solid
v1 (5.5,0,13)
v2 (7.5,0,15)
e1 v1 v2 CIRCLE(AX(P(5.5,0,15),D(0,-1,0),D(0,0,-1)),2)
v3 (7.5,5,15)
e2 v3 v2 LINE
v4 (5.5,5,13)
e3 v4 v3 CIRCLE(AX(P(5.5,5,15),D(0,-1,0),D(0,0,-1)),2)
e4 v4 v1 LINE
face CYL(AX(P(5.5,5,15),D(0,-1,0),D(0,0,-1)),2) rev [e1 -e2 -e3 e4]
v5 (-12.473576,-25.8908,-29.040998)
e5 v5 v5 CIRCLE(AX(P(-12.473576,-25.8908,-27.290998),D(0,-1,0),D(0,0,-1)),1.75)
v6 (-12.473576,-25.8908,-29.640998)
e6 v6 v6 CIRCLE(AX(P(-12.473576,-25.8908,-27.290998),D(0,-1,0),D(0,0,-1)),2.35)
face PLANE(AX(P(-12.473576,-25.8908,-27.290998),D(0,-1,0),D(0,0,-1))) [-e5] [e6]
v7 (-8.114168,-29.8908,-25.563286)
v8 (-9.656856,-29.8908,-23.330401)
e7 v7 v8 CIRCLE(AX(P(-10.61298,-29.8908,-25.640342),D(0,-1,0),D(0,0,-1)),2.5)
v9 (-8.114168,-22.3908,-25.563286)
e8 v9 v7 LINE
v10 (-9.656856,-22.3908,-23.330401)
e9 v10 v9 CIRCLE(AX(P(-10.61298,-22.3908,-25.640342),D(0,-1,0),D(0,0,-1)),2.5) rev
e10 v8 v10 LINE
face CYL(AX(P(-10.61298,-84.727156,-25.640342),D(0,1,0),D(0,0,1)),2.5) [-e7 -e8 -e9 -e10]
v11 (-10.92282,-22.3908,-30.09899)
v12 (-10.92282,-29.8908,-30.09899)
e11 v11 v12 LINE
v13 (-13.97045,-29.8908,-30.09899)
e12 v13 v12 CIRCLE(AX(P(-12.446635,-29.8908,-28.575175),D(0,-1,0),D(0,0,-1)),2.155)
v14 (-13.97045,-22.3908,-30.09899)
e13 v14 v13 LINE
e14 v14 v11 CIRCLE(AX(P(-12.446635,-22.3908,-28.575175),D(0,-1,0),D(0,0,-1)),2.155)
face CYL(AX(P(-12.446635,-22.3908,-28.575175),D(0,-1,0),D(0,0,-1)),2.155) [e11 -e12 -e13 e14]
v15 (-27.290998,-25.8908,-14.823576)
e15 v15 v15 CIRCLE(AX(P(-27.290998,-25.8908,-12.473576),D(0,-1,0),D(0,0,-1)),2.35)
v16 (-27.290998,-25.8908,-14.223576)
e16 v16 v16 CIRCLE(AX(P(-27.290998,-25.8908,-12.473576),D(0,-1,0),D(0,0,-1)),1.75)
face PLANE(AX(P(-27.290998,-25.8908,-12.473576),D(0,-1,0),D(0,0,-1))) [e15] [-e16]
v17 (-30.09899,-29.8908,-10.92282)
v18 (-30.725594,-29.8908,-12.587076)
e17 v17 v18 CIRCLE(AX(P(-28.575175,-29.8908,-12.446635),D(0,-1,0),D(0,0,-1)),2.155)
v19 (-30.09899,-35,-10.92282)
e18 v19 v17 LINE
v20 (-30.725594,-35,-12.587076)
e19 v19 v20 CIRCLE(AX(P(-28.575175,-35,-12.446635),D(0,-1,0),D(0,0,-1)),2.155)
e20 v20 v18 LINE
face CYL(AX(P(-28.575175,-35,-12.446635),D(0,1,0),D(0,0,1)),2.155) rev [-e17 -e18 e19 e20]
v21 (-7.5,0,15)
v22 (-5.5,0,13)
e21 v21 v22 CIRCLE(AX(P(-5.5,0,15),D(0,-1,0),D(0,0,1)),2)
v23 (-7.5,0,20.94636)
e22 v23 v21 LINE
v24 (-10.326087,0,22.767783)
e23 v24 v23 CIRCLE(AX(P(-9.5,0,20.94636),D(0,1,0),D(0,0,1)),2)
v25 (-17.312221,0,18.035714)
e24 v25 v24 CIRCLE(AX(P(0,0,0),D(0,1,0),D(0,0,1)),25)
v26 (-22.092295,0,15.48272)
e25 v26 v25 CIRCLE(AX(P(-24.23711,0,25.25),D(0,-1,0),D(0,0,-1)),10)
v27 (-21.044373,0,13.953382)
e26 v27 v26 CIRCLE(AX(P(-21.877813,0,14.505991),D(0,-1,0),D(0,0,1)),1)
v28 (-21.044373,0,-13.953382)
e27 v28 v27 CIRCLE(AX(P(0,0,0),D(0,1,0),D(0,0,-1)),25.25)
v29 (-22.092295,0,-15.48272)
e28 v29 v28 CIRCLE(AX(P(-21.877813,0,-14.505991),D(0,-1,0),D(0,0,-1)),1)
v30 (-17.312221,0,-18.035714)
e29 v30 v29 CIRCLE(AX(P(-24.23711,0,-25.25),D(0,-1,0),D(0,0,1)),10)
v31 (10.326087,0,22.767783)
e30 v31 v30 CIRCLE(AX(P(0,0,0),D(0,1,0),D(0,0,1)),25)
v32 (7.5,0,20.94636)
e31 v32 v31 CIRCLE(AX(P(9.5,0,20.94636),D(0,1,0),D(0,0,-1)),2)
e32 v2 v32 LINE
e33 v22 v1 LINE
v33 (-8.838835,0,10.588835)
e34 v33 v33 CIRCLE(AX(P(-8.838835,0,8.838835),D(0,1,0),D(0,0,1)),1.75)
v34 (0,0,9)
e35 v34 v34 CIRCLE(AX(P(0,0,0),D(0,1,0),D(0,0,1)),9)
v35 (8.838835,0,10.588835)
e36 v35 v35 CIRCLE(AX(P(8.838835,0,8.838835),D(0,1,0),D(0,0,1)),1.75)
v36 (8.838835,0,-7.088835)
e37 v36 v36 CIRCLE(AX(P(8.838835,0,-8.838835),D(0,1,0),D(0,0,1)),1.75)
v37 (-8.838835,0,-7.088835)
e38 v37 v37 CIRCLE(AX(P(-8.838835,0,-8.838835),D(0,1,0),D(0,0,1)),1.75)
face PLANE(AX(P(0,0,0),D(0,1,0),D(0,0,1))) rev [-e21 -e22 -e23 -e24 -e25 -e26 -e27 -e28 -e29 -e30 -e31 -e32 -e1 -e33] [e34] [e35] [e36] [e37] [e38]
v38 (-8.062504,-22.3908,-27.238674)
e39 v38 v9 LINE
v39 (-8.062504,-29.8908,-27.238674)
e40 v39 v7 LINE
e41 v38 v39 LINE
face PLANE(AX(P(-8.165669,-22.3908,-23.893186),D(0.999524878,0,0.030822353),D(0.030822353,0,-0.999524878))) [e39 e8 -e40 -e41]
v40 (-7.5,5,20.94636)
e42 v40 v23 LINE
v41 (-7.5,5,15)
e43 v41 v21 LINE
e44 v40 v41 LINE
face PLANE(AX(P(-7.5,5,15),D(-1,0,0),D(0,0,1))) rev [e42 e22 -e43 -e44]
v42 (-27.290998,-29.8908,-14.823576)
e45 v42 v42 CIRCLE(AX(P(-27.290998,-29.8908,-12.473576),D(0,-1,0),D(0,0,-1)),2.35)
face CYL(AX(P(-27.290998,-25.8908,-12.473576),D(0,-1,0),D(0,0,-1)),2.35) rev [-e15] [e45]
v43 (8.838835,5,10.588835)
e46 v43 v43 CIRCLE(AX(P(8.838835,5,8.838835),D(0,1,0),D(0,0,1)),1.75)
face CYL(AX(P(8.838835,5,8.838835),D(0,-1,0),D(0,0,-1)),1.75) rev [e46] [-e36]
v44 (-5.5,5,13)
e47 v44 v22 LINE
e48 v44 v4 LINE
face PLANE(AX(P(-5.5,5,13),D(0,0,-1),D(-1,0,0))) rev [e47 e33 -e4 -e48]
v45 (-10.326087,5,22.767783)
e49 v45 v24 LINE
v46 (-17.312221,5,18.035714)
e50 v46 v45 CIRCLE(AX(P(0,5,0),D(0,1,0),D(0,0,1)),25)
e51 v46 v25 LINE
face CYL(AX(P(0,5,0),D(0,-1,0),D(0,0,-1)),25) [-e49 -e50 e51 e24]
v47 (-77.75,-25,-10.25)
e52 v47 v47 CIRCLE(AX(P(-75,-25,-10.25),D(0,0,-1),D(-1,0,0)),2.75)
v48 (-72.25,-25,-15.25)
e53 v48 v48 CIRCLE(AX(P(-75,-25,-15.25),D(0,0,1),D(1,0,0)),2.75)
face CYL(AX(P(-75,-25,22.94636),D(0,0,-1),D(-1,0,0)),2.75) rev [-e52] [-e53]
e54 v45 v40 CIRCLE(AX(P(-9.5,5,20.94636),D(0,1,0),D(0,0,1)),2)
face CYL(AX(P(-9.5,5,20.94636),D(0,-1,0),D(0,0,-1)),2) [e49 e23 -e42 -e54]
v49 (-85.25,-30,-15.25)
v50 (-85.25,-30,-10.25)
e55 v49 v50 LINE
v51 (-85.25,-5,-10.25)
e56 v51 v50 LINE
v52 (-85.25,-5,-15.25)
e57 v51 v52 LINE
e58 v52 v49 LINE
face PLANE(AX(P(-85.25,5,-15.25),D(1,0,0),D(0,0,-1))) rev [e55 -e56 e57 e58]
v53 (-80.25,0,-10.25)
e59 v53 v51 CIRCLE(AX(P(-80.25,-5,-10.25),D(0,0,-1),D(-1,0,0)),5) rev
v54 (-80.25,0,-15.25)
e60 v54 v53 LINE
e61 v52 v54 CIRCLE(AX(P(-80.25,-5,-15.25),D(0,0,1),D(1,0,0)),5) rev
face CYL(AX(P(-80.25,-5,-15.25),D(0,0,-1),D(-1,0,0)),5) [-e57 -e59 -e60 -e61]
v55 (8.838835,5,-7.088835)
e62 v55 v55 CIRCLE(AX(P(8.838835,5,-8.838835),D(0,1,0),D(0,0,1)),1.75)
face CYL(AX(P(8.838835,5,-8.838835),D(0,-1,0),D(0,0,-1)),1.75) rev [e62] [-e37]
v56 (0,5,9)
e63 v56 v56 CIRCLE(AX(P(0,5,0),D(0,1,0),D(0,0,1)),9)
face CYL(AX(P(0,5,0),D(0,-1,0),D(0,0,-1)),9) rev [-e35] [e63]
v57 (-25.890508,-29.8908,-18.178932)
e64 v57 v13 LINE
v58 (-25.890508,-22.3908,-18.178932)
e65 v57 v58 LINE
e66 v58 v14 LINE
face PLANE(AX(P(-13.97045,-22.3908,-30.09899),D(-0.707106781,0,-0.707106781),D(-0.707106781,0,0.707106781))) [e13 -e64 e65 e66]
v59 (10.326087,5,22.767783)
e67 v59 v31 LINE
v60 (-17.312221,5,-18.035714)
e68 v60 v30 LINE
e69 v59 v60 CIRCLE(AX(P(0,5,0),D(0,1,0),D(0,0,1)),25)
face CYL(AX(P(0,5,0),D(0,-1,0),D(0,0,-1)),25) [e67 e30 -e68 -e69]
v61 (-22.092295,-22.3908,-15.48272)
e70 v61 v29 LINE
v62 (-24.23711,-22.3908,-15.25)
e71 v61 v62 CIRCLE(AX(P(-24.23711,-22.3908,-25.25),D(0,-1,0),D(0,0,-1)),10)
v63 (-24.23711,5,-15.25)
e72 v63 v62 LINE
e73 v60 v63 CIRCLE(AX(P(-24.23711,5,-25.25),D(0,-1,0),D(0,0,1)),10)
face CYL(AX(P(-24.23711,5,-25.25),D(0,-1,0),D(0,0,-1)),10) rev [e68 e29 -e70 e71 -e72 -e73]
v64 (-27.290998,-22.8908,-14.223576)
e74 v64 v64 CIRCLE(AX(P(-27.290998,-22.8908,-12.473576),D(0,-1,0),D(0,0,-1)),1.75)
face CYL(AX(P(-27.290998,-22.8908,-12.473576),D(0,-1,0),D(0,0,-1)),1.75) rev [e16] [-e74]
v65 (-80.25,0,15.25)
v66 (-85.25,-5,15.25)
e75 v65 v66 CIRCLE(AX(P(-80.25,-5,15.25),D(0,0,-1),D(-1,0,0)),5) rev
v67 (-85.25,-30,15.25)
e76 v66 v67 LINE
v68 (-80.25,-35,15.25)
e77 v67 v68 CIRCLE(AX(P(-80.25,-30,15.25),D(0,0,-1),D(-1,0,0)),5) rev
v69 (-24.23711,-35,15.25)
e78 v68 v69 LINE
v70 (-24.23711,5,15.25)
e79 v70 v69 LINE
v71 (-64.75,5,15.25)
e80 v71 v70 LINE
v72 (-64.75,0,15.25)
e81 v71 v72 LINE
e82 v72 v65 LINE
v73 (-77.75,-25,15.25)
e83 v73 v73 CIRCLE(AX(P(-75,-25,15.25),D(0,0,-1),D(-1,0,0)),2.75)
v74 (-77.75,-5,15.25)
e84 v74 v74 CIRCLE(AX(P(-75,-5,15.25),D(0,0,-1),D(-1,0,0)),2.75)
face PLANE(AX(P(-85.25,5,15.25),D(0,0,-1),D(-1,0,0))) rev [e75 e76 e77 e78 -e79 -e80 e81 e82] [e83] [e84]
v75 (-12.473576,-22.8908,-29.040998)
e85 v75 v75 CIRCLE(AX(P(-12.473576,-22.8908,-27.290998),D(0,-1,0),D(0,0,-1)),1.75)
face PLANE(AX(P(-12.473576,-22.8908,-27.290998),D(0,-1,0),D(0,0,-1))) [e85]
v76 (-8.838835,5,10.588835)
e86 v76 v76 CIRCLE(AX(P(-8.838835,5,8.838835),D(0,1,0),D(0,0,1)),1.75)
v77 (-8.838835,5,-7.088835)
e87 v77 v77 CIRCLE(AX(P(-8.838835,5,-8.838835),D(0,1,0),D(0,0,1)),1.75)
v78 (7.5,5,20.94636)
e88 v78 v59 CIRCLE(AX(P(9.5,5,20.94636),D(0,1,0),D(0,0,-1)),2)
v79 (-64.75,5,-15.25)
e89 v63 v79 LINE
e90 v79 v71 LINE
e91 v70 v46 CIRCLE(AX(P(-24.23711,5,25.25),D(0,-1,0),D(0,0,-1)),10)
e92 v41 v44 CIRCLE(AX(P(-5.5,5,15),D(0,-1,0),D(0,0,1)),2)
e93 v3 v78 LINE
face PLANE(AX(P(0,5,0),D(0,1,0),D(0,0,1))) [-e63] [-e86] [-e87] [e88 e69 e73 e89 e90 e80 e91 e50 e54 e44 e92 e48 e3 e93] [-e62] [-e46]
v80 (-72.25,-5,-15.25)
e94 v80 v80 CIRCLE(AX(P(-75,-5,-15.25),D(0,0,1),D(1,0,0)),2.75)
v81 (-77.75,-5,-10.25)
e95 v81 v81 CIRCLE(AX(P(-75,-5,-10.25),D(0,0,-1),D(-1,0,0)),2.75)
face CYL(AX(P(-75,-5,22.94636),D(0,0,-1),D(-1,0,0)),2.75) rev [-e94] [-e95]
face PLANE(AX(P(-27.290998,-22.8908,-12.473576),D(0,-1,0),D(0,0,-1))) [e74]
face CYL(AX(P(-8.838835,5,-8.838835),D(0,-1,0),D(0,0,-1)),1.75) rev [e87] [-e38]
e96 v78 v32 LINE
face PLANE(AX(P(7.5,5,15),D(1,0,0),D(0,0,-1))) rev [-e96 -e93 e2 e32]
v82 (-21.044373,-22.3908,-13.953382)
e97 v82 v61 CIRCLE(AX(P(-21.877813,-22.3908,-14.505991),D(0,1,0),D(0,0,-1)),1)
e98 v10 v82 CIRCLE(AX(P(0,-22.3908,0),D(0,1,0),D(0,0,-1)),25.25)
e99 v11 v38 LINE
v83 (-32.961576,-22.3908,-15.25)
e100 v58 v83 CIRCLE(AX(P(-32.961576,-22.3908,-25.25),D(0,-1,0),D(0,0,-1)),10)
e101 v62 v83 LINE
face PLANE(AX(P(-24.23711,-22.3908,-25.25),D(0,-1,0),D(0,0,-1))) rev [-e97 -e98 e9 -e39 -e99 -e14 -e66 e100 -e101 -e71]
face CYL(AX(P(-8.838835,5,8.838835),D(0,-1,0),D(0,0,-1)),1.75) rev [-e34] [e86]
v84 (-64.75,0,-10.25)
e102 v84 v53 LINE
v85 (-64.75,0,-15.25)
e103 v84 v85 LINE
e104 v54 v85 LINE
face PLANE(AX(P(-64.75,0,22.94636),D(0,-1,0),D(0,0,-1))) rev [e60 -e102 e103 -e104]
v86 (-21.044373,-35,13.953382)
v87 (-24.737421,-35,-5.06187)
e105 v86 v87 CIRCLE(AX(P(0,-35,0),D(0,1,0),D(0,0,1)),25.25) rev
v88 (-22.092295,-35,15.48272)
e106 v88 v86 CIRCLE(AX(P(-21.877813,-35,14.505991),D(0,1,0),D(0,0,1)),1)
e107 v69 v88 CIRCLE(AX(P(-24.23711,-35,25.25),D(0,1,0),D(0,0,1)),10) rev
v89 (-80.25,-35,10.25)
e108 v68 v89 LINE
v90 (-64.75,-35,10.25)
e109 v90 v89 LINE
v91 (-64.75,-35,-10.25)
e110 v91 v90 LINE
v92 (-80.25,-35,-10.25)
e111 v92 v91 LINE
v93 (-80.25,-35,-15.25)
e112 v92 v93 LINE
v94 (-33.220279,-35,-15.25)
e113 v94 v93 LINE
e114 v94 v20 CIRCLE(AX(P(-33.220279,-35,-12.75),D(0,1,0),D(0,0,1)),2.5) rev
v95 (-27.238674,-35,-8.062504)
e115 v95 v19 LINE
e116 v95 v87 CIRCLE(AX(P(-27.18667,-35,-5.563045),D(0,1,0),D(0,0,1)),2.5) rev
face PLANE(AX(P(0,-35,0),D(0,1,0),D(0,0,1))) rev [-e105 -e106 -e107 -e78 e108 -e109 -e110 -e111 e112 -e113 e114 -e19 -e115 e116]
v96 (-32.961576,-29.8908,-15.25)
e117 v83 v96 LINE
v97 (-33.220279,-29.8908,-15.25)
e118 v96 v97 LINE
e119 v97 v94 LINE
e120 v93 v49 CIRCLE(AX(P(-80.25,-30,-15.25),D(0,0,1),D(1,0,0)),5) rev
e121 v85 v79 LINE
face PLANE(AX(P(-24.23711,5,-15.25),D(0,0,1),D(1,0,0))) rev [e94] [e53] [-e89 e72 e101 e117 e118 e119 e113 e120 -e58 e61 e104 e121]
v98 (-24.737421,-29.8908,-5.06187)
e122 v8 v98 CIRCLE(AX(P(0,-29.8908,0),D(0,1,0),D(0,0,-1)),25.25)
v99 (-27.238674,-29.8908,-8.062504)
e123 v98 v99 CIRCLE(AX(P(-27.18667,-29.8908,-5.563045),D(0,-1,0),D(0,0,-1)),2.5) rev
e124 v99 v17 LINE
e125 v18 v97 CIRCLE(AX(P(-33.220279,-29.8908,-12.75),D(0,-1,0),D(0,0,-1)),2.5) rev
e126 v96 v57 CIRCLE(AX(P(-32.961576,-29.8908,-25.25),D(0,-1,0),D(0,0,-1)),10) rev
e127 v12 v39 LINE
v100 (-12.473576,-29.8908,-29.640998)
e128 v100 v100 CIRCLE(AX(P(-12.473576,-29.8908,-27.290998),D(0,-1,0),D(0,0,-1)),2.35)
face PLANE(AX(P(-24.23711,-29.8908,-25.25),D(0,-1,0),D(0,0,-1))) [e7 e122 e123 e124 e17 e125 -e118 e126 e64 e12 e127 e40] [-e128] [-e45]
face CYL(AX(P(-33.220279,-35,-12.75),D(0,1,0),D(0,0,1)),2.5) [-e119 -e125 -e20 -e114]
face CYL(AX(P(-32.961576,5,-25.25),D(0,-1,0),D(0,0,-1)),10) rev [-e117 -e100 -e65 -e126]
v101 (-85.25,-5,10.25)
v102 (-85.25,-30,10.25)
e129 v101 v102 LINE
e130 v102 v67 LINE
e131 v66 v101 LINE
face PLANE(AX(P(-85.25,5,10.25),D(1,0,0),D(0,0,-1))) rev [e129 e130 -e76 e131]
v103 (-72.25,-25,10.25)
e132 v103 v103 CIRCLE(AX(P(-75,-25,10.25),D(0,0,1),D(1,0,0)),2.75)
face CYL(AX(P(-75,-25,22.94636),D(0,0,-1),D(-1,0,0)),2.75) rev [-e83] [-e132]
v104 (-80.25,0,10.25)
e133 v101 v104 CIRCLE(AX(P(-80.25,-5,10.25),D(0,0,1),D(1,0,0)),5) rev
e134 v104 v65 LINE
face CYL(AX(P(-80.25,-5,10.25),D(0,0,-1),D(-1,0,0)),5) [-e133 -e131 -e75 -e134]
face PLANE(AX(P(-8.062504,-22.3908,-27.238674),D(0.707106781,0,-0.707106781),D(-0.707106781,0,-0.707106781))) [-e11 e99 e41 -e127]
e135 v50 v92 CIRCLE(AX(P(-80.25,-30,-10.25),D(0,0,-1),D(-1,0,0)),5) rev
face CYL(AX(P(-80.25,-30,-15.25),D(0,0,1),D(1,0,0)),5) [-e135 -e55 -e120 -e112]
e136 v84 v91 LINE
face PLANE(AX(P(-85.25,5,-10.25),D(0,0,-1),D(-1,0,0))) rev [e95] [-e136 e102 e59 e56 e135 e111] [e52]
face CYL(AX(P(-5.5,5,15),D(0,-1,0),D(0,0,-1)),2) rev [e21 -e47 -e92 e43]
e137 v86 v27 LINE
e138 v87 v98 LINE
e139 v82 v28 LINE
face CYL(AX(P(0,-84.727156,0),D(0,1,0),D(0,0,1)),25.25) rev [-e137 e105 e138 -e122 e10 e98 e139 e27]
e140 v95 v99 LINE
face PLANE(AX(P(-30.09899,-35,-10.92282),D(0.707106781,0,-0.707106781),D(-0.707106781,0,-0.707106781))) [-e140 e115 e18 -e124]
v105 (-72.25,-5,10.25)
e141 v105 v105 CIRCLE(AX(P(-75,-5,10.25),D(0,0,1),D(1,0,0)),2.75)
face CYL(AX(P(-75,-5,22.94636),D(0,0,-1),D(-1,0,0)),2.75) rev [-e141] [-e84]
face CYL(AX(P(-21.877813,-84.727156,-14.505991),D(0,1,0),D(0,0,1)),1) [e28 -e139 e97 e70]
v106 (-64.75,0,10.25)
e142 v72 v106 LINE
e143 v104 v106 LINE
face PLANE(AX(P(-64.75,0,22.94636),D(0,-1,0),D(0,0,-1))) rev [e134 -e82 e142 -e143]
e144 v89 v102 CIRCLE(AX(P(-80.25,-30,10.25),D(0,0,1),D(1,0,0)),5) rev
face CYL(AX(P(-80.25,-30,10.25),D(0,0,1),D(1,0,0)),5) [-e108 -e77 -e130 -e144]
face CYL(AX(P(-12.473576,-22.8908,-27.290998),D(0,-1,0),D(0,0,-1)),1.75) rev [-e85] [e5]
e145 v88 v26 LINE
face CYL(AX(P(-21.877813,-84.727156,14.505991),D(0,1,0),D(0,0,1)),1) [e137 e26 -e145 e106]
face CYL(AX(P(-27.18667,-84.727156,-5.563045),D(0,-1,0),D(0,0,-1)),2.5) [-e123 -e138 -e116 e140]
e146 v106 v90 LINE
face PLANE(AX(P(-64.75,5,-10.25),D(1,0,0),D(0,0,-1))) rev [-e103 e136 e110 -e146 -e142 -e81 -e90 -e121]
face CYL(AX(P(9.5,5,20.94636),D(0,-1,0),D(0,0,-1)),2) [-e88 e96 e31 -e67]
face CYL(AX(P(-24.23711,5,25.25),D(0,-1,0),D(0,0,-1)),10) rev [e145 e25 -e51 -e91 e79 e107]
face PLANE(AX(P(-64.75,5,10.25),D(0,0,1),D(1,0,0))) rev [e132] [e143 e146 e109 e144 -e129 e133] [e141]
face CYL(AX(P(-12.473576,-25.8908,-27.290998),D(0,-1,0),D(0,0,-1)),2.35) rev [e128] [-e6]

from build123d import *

# Parameters (mm, degrees)
SKETCH1_R               = 1.7499999999999998
SKETCH1_R_2             = 9
MOTOR_PLATE_DEPTH       = 5
BOSS_EXTRUDE1_DEPTH     = 35
BOSS_EXTRUDE2_START     = 35
BOSS_EXTRUDE2_DEPTH     = 35
CUT_EXTRUDE5_DEPTH      = 100.75732766200707
CUT_EXTRUDE5_DEPTH_BACK = 100.75732766200707
SKETCH11_R              = 2.7500000000000084
SKETCH11_R_2            = 2.750000000000008
CUT_EXTRUDE7_DEPTH      = 100.75732766200707
CUT_EXTRUDE7_DEPTH_BACK = 100.75732766200707
SKETCH14_W              = 20.499999999999986
SKETCH14_H              = 5
FILLET4_R               = 5
BOSS_EXTRUDE5_DEPTH     = 7.5
CUT_EXTRUDE14_DEPTH     = 98.1044493253111
SKETCH27_R              = 2.3500000000000005
CUT_EXTRUDE15_DEPTH     = 4
SKETCH28_R              = 1.7499999999999998
SKETCH28_R_2            = 1.7500000000000004
CUT_EXTRUDE16_DEPTH     = 7
FILLET5_R               = 2.5
FILLET6_R               = 10


with BuildPart() as part:
    # Sketch1 → Motor Plate (new body)
    with BuildSketch(Plane(origin=(0, 0, 0), x_dir=(1, 0, 0), z_dir=(0, 1, 0))):
        with BuildLine():
            Line((-24.237109976232734, 15.250000000000002), (-85.24999999999999, 15.25))
            Line((-85.24999999999999, 15.25), (-85.24999999999999, 10.25))
            Line((-85.24999999999999, 10.25), (-64.75, 10.25))
            Line((-64.75, 10.25), (-64.75, -10.250000000000002))
            Line((-64.75, -10.250000000000002), (-85.24999999999999, -10.250000000000002))
            Line((-85.24999999999999, -10.250000000000002), (-85.24999999999999, -15.250000000000002))
            Line((-85.24999999999999, -15.250000000000002), (-24.237109976232734, -15.25))
            ThreePointArc((-24.237109976232734, -15.25), (-20.505009839771837, -15.972531133362475), (-17.31222141159481, -18.03571428571429))
            ThreePointArc((-17.31222141159481, -18.03571428571429), (-14.020240375434447, -20.698619756279353), (-10.326086956521745, -22.76778268005806))
            ThreePointArc((-10.326086956521745, -22.76778268005806), (-8.416527322228076, -22.627457016016997), (-7.500000000000001, -20.94636006565341))
            Line((-7.500000000000001, -20.94636006565341), (-7.500000000000001, -15))
            ThreePointArc((-7.500000000000001, -15), (-6.914213562373096, -13.585786437626904), (-5.500000000000001, -13))
            Line((-5.500000000000001, -13), (5.499999999999999, -13))
            ThreePointArc((5.499999999999999, -13), (6.914213562373094, -13.585786437626904), (7.499999999999999, -15))
            Line((7.499999999999999, -15), (7.499999999999999, -20.94636006565341))
            ThreePointArc((7.499999999999999, -20.94636006565341), (8.416527322228072, -22.627457016016997), (10.32608695652174, -22.76778268005806))
            ThreePointArc((10.32608695652174, -22.76778268005806), (20.698619756279356, 14.020240375434444), (-17.31222141159481, 18.035714285714285))
            ThreePointArc((-17.31222141159481, 18.035714285714285), (-20.50500983977184, 15.972531133362477), (-24.237109976232734, 15.250000000000002))
        make_face()
        with Locations(Location((8.838834764831846, 8.838834764831835, 0), (0, 0, 270))):
            Circle(SKETCH1_R, mode=Mode.SUBTRACT)
        with Locations(Location((-8.838834764831843, 8.838834764831846, 0), (0, 0, 270))):
            Circle(SKETCH1_R, mode=Mode.SUBTRACT)
        with Locations(Location((-8.838834764831843, -8.838834764831846, 0), (0, 0, 270))):
            Circle(SKETCH1_R, mode=Mode.SUBTRACT)
        with Locations(Location((8.838834764831846, -8.838834764831835, 0), (0, 0, 270))):
            Circle(SKETCH1_R, mode=Mode.SUBTRACT)
        with Locations(Location((0, 0, 0), (0, 0, 270))):
            Circle(SKETCH1_R_2, mode=Mode.SUBTRACT)
    extrude(amount=MOTOR_PLATE_DEPTH)

    # Sketch3 → Boss-Extrude1 (add)
    with BuildSketch(Plane.XZ):
        Polygon((-85.24999999999999, 15.250000000000002), (-85.24999999999999, 10.250000000000002), (-64.75, 10.250000000000002), (-64.75, -10.25), (-85.24999999999999, -10.25), (-85.24999999999999, -15.25), (-59.75, -15.25), (-59.75, 15.250000000000002), align=None)
    extrude(amount=BOSS_EXTRUDE1_DEPTH)

    # Sketch4 → Boss-Extrude2 (add)
    with BuildSketch(Plane.XZ.offset(BOSS_EXTRUDE2_START)):
        with BuildLine():
            Line((-59.75, -15.25), (-59.75, 15.250000000000002))
            Line((-59.75, 15.250000000000002), (-24.237109976232734, 15.25))
            ThreePointArc((-24.237109976232734, 15.25), (-23.15840811564324, 15.30835012203906), (-22.09229473209558, 15.482719540807848))
            ThreePointArc((-22.09229473209558, 15.482719540807848), (-21.052891601024875, 15.071238646911935), (-21.04437270453208, 13.953382295083351))
            ThreePointArc((-21.04437270453208, 13.953382295083351), (-25.250000000000007, 3.09e-15), (-21.044372704532076, -13.953382295083353))
            ThreePointArc((-21.044372704532076, -13.953382295083353), (-21.05289160102487, -15.071238646911937), (-22.092294732095578, -15.48271954080785))
            ThreePointArc((-22.092294732095578, -15.48271954080785), (-23.15840811564324, -15.308350122039062), (-24.237109976232734, -15.25))
            Line((-24.237109976232734, -15.25), (-59.75, -15.25))
        make_face()
    extrude(amount=-BOSS_EXTRUDE2_DEPTH)

    # Sketch11 → Cut-Extrude5 (cut, two sides: drawn at the far end of the back side and taken through both)
    with BuildSketch(Plane(origin=(-4.3e-16, 0, -15.250000000000002), x_dir=(-1, 0, 6e-17), z_dir=(-6e-17, 0, -1)).offset(-CUT_EXTRUDE5_DEPTH_BACK)):
        with Locations((75, -25)):
            Circle(SKETCH11_R)
        with Locations((75, -5.000000000000001)):
            Circle(SKETCH11_R_2)
    extrude(amount=CUT_EXTRUDE5_DEPTH + CUT_EXTRUDE5_DEPTH_BACK, mode=Mode.SUBTRACT)

    # Sketch14 → Cut-Extrude7 (cut, two sides: drawn at the far end of the back side and taken through both)
    with BuildSketch(Plane(origin=(-4.3e-16, 0, -15.250000000000002), x_dir=(-1, 0, 6e-17), z_dir=(-6e-17, 0, -1)).offset(-CUT_EXTRUDE7_DEPTH_BACK)):
        with Locations((75, 2.5)):
            Rectangle(SKETCH14_W, SKETCH14_H)
    extrude(amount=CUT_EXTRUDE7_DEPTH + CUT_EXTRUDE7_DEPTH_BACK, mode=Mode.SUBTRACT)

    # Fillet4
    fillet4_edges = [part.edges().sort_by_distance(p)[0] for p in [
        (-85.24999999999999, 0, -12.75),
        (-85.24999999999999, 0, 12.75),
        (-85.24999999999999, -35, -12.75),
        (-85.24999999999999, -35, 12.750000000000002),
    ]]
    fillet(fillet4_edges, radius=FILLET4_R)

    # Sketch24 → Boss-Extrude5 (add)
    with BuildSketch(Plane(origin=(0, -29.8908, 0), x_dir=(-1, 0, 0), z_dir=(0, -1, 0))):
        with BuildLine():
            Line((24.237109976232734, 15.25), (28.819440187957916, 15.25))
            Line((28.819440187957916, 15.25), (13.970450097258862, 30.09899009069905))
            ThreePointArc((13.970450097258862, 30.09899009069905), (12.44663498380185, 30.730174977242044), (10.92281987034484, 30.09899009069905))
            Line((10.92281987034484, 30.09899009069905), (8.062504135197518, 27.238674355551726))
            Line((8.062504135197518, 27.238674355551726), (8.165668965896261, 23.893186274320946))
            ThreePointArc((8.165668965896261, 23.893186274320946), (15.42746120991581, 19.988895432628166), (21.044372704532083, 13.95338229508334))
            ThreePointArc((21.044372704532083, 13.95338229508334), (21.052891601024868, 15.07123864691193), (22.092294732095578, 15.482719540807848))
            ThreePointArc((22.092294732095578, 15.482719540807848), (23.15840811564324, 15.30835012203906), (24.237109976232734, 15.25))
        make_face()
    extrude(amount=-BOSS_EXTRUDE5_DEPTH)

    # Sketch26 → Cut-Extrude14 (cut, through all)
    with BuildSketch(Plane.XZ.offset(29.8908)):
        with BuildLine():
            Line((-18.976555851670547, -8.317283119898706), (-13.970450097258862, -30.09899009069905))
            Line((-13.970450097258862, -30.09899009069905), (-30.098990090699047, -13.970450097258864))
            ThreePointArc((-30.098990090699047, -13.970450097258864), (-30.730174977242033, -12.446634983801854), (-30.098990090699044, -10.92281987034485))
            Line((-30.098990090699044, -10.92281987034485), (-27.238674355551726, -8.062504135197523))
            Line((-27.238674355551726, -8.062504135197523), (-18.976555851670547, -8.317283119898706))
        make_face()
    extrude(amount=CUT_EXTRUDE14_DEPTH, mode=Mode.SUBTRACT)

    # Sketch27 → Cut-Extrude15 (cut)
    with BuildSketch(Plane.XZ.offset(29.8908)):
        with Locations(Location((-27.29099835192915, -12.473575752165065, 0), (0, 0, 270))):
            Circle(SKETCH27_R)
        with Locations(Location((-12.47357575216505, -27.290998351929158, 0), (0, 0, 270))):
            Circle(SKETCH27_R)
    extrude(amount=-CUT_EXTRUDE15_DEPTH, mode=Mode.SUBTRACT)

    # Sketch28 → Cut-Extrude16 (cut)
    with BuildSketch(Plane.XZ.offset(29.8908)):
        with Locations(Location((-27.29099835192915, -12.473575752165065, 0), (0, 0, 270))):
            Circle(SKETCH28_R)
        with Locations(Location((-12.47357575216505, -27.290998351929158, 0), (0, 0, 270))):
            Circle(SKETCH28_R_2)
    extrude(amount=-CUT_EXTRUDE16_DEPTH, mode=Mode.SUBTRACT)

    # Fillet5
    # the kernel refuses this fillet: 2.5 mm, written as the material it takes off along each edge
    with BuildSketch(Plane(origin=(-8.165668965896261, -34.068034873717735, -23.89318627432096), x_dir=(-0.9355866460023518, 0, 0.35309719316651356), z_dir=(0, 1, 0))) as fillet5_piece_1:
        with BuildLine():
            CenterArc((1.6727559192968875, -2.498754534741212), FILLET5_R, 91.80863723012877, 65.74822155289536)
            Line((-0.6378911862633408, -1.54433850723217), (0, 0))
            ThreePointArc((0, 0), (0.7969261690989898, -0.0125791991137666), (1.59385233819798, 7e-17))
        make_face()
    extrude(amount=15.854469747435477, mode=Mode.SUBTRACT)
    with BuildSketch(Plane(origin=(-28.819440187957913, -29.8908, -15.249999999999998), x_dir=(-0.5820598075620075, 0, 0.8131459773133474), z_dir=(0, -1, 0))) as fillet5_piece_2:
        with BuildLine():
            CenterArc((4.594416541128744, 2.123375145412493), FILLET5_R, 144.40445067780377, 93.73659766899215)
            Line((2.5615515978453756, 3.578524664317512), (2.3582651035170388, 3.724039616208014))
            Line((2.3582651035170388, 3.724039616208014), (-0.20328649432833684, 0.14551495189050187))
            Line((-0.20328649432833684, 0.14551495189050187), (0.0408506494173984, -0.24663986790901668))
            ThreePointArc((0.0408506494173984, -0.24663986790901668), (1.826086075758527, 0.04904641812113162), (3.142884119812632, -0.21233751454124886))
            Line((3.142884119812632, -0.21233751454124886), (3.274841612659551, 3e-17))
        make_face()
    extrude(amount=16.111297914021037, mode=Mode.SUBTRACT)
    with BuildSketch(Plane(origin=(-23.893186274320946, -29.8908, -8.16566896589627), x_dir=(-0.2624644085594799, 0, 0.9649416740091198), z_dir=(0, -1, 0))) as fillet5_piece_3:
        with BuildLine():
            CenterArc((3.375802522576318, 2.494923627384301), FILLET5_R, 163.59172174149506, 102.75638657572608)
            Line((0.977619595016342, 3.2011237732069016), (0, 0))
            ThreePointArc((0, 0), (1.6082832772651305, 0.05127136341856297), (3.216566554530266, 6e-17))
        make_face()
    extrude(amount=13.476895876087362, mode=Mode.SUBTRACT)

    # Fillet6
    fillet6_edges = [part.edges().sort_by_distance(p)[0] for p in [
        (-28.819440187957916, -26.1408, -15.25),
    ]]
    fillet(fillet6_edges, radius=FILLET6_R)


solid = part.part
